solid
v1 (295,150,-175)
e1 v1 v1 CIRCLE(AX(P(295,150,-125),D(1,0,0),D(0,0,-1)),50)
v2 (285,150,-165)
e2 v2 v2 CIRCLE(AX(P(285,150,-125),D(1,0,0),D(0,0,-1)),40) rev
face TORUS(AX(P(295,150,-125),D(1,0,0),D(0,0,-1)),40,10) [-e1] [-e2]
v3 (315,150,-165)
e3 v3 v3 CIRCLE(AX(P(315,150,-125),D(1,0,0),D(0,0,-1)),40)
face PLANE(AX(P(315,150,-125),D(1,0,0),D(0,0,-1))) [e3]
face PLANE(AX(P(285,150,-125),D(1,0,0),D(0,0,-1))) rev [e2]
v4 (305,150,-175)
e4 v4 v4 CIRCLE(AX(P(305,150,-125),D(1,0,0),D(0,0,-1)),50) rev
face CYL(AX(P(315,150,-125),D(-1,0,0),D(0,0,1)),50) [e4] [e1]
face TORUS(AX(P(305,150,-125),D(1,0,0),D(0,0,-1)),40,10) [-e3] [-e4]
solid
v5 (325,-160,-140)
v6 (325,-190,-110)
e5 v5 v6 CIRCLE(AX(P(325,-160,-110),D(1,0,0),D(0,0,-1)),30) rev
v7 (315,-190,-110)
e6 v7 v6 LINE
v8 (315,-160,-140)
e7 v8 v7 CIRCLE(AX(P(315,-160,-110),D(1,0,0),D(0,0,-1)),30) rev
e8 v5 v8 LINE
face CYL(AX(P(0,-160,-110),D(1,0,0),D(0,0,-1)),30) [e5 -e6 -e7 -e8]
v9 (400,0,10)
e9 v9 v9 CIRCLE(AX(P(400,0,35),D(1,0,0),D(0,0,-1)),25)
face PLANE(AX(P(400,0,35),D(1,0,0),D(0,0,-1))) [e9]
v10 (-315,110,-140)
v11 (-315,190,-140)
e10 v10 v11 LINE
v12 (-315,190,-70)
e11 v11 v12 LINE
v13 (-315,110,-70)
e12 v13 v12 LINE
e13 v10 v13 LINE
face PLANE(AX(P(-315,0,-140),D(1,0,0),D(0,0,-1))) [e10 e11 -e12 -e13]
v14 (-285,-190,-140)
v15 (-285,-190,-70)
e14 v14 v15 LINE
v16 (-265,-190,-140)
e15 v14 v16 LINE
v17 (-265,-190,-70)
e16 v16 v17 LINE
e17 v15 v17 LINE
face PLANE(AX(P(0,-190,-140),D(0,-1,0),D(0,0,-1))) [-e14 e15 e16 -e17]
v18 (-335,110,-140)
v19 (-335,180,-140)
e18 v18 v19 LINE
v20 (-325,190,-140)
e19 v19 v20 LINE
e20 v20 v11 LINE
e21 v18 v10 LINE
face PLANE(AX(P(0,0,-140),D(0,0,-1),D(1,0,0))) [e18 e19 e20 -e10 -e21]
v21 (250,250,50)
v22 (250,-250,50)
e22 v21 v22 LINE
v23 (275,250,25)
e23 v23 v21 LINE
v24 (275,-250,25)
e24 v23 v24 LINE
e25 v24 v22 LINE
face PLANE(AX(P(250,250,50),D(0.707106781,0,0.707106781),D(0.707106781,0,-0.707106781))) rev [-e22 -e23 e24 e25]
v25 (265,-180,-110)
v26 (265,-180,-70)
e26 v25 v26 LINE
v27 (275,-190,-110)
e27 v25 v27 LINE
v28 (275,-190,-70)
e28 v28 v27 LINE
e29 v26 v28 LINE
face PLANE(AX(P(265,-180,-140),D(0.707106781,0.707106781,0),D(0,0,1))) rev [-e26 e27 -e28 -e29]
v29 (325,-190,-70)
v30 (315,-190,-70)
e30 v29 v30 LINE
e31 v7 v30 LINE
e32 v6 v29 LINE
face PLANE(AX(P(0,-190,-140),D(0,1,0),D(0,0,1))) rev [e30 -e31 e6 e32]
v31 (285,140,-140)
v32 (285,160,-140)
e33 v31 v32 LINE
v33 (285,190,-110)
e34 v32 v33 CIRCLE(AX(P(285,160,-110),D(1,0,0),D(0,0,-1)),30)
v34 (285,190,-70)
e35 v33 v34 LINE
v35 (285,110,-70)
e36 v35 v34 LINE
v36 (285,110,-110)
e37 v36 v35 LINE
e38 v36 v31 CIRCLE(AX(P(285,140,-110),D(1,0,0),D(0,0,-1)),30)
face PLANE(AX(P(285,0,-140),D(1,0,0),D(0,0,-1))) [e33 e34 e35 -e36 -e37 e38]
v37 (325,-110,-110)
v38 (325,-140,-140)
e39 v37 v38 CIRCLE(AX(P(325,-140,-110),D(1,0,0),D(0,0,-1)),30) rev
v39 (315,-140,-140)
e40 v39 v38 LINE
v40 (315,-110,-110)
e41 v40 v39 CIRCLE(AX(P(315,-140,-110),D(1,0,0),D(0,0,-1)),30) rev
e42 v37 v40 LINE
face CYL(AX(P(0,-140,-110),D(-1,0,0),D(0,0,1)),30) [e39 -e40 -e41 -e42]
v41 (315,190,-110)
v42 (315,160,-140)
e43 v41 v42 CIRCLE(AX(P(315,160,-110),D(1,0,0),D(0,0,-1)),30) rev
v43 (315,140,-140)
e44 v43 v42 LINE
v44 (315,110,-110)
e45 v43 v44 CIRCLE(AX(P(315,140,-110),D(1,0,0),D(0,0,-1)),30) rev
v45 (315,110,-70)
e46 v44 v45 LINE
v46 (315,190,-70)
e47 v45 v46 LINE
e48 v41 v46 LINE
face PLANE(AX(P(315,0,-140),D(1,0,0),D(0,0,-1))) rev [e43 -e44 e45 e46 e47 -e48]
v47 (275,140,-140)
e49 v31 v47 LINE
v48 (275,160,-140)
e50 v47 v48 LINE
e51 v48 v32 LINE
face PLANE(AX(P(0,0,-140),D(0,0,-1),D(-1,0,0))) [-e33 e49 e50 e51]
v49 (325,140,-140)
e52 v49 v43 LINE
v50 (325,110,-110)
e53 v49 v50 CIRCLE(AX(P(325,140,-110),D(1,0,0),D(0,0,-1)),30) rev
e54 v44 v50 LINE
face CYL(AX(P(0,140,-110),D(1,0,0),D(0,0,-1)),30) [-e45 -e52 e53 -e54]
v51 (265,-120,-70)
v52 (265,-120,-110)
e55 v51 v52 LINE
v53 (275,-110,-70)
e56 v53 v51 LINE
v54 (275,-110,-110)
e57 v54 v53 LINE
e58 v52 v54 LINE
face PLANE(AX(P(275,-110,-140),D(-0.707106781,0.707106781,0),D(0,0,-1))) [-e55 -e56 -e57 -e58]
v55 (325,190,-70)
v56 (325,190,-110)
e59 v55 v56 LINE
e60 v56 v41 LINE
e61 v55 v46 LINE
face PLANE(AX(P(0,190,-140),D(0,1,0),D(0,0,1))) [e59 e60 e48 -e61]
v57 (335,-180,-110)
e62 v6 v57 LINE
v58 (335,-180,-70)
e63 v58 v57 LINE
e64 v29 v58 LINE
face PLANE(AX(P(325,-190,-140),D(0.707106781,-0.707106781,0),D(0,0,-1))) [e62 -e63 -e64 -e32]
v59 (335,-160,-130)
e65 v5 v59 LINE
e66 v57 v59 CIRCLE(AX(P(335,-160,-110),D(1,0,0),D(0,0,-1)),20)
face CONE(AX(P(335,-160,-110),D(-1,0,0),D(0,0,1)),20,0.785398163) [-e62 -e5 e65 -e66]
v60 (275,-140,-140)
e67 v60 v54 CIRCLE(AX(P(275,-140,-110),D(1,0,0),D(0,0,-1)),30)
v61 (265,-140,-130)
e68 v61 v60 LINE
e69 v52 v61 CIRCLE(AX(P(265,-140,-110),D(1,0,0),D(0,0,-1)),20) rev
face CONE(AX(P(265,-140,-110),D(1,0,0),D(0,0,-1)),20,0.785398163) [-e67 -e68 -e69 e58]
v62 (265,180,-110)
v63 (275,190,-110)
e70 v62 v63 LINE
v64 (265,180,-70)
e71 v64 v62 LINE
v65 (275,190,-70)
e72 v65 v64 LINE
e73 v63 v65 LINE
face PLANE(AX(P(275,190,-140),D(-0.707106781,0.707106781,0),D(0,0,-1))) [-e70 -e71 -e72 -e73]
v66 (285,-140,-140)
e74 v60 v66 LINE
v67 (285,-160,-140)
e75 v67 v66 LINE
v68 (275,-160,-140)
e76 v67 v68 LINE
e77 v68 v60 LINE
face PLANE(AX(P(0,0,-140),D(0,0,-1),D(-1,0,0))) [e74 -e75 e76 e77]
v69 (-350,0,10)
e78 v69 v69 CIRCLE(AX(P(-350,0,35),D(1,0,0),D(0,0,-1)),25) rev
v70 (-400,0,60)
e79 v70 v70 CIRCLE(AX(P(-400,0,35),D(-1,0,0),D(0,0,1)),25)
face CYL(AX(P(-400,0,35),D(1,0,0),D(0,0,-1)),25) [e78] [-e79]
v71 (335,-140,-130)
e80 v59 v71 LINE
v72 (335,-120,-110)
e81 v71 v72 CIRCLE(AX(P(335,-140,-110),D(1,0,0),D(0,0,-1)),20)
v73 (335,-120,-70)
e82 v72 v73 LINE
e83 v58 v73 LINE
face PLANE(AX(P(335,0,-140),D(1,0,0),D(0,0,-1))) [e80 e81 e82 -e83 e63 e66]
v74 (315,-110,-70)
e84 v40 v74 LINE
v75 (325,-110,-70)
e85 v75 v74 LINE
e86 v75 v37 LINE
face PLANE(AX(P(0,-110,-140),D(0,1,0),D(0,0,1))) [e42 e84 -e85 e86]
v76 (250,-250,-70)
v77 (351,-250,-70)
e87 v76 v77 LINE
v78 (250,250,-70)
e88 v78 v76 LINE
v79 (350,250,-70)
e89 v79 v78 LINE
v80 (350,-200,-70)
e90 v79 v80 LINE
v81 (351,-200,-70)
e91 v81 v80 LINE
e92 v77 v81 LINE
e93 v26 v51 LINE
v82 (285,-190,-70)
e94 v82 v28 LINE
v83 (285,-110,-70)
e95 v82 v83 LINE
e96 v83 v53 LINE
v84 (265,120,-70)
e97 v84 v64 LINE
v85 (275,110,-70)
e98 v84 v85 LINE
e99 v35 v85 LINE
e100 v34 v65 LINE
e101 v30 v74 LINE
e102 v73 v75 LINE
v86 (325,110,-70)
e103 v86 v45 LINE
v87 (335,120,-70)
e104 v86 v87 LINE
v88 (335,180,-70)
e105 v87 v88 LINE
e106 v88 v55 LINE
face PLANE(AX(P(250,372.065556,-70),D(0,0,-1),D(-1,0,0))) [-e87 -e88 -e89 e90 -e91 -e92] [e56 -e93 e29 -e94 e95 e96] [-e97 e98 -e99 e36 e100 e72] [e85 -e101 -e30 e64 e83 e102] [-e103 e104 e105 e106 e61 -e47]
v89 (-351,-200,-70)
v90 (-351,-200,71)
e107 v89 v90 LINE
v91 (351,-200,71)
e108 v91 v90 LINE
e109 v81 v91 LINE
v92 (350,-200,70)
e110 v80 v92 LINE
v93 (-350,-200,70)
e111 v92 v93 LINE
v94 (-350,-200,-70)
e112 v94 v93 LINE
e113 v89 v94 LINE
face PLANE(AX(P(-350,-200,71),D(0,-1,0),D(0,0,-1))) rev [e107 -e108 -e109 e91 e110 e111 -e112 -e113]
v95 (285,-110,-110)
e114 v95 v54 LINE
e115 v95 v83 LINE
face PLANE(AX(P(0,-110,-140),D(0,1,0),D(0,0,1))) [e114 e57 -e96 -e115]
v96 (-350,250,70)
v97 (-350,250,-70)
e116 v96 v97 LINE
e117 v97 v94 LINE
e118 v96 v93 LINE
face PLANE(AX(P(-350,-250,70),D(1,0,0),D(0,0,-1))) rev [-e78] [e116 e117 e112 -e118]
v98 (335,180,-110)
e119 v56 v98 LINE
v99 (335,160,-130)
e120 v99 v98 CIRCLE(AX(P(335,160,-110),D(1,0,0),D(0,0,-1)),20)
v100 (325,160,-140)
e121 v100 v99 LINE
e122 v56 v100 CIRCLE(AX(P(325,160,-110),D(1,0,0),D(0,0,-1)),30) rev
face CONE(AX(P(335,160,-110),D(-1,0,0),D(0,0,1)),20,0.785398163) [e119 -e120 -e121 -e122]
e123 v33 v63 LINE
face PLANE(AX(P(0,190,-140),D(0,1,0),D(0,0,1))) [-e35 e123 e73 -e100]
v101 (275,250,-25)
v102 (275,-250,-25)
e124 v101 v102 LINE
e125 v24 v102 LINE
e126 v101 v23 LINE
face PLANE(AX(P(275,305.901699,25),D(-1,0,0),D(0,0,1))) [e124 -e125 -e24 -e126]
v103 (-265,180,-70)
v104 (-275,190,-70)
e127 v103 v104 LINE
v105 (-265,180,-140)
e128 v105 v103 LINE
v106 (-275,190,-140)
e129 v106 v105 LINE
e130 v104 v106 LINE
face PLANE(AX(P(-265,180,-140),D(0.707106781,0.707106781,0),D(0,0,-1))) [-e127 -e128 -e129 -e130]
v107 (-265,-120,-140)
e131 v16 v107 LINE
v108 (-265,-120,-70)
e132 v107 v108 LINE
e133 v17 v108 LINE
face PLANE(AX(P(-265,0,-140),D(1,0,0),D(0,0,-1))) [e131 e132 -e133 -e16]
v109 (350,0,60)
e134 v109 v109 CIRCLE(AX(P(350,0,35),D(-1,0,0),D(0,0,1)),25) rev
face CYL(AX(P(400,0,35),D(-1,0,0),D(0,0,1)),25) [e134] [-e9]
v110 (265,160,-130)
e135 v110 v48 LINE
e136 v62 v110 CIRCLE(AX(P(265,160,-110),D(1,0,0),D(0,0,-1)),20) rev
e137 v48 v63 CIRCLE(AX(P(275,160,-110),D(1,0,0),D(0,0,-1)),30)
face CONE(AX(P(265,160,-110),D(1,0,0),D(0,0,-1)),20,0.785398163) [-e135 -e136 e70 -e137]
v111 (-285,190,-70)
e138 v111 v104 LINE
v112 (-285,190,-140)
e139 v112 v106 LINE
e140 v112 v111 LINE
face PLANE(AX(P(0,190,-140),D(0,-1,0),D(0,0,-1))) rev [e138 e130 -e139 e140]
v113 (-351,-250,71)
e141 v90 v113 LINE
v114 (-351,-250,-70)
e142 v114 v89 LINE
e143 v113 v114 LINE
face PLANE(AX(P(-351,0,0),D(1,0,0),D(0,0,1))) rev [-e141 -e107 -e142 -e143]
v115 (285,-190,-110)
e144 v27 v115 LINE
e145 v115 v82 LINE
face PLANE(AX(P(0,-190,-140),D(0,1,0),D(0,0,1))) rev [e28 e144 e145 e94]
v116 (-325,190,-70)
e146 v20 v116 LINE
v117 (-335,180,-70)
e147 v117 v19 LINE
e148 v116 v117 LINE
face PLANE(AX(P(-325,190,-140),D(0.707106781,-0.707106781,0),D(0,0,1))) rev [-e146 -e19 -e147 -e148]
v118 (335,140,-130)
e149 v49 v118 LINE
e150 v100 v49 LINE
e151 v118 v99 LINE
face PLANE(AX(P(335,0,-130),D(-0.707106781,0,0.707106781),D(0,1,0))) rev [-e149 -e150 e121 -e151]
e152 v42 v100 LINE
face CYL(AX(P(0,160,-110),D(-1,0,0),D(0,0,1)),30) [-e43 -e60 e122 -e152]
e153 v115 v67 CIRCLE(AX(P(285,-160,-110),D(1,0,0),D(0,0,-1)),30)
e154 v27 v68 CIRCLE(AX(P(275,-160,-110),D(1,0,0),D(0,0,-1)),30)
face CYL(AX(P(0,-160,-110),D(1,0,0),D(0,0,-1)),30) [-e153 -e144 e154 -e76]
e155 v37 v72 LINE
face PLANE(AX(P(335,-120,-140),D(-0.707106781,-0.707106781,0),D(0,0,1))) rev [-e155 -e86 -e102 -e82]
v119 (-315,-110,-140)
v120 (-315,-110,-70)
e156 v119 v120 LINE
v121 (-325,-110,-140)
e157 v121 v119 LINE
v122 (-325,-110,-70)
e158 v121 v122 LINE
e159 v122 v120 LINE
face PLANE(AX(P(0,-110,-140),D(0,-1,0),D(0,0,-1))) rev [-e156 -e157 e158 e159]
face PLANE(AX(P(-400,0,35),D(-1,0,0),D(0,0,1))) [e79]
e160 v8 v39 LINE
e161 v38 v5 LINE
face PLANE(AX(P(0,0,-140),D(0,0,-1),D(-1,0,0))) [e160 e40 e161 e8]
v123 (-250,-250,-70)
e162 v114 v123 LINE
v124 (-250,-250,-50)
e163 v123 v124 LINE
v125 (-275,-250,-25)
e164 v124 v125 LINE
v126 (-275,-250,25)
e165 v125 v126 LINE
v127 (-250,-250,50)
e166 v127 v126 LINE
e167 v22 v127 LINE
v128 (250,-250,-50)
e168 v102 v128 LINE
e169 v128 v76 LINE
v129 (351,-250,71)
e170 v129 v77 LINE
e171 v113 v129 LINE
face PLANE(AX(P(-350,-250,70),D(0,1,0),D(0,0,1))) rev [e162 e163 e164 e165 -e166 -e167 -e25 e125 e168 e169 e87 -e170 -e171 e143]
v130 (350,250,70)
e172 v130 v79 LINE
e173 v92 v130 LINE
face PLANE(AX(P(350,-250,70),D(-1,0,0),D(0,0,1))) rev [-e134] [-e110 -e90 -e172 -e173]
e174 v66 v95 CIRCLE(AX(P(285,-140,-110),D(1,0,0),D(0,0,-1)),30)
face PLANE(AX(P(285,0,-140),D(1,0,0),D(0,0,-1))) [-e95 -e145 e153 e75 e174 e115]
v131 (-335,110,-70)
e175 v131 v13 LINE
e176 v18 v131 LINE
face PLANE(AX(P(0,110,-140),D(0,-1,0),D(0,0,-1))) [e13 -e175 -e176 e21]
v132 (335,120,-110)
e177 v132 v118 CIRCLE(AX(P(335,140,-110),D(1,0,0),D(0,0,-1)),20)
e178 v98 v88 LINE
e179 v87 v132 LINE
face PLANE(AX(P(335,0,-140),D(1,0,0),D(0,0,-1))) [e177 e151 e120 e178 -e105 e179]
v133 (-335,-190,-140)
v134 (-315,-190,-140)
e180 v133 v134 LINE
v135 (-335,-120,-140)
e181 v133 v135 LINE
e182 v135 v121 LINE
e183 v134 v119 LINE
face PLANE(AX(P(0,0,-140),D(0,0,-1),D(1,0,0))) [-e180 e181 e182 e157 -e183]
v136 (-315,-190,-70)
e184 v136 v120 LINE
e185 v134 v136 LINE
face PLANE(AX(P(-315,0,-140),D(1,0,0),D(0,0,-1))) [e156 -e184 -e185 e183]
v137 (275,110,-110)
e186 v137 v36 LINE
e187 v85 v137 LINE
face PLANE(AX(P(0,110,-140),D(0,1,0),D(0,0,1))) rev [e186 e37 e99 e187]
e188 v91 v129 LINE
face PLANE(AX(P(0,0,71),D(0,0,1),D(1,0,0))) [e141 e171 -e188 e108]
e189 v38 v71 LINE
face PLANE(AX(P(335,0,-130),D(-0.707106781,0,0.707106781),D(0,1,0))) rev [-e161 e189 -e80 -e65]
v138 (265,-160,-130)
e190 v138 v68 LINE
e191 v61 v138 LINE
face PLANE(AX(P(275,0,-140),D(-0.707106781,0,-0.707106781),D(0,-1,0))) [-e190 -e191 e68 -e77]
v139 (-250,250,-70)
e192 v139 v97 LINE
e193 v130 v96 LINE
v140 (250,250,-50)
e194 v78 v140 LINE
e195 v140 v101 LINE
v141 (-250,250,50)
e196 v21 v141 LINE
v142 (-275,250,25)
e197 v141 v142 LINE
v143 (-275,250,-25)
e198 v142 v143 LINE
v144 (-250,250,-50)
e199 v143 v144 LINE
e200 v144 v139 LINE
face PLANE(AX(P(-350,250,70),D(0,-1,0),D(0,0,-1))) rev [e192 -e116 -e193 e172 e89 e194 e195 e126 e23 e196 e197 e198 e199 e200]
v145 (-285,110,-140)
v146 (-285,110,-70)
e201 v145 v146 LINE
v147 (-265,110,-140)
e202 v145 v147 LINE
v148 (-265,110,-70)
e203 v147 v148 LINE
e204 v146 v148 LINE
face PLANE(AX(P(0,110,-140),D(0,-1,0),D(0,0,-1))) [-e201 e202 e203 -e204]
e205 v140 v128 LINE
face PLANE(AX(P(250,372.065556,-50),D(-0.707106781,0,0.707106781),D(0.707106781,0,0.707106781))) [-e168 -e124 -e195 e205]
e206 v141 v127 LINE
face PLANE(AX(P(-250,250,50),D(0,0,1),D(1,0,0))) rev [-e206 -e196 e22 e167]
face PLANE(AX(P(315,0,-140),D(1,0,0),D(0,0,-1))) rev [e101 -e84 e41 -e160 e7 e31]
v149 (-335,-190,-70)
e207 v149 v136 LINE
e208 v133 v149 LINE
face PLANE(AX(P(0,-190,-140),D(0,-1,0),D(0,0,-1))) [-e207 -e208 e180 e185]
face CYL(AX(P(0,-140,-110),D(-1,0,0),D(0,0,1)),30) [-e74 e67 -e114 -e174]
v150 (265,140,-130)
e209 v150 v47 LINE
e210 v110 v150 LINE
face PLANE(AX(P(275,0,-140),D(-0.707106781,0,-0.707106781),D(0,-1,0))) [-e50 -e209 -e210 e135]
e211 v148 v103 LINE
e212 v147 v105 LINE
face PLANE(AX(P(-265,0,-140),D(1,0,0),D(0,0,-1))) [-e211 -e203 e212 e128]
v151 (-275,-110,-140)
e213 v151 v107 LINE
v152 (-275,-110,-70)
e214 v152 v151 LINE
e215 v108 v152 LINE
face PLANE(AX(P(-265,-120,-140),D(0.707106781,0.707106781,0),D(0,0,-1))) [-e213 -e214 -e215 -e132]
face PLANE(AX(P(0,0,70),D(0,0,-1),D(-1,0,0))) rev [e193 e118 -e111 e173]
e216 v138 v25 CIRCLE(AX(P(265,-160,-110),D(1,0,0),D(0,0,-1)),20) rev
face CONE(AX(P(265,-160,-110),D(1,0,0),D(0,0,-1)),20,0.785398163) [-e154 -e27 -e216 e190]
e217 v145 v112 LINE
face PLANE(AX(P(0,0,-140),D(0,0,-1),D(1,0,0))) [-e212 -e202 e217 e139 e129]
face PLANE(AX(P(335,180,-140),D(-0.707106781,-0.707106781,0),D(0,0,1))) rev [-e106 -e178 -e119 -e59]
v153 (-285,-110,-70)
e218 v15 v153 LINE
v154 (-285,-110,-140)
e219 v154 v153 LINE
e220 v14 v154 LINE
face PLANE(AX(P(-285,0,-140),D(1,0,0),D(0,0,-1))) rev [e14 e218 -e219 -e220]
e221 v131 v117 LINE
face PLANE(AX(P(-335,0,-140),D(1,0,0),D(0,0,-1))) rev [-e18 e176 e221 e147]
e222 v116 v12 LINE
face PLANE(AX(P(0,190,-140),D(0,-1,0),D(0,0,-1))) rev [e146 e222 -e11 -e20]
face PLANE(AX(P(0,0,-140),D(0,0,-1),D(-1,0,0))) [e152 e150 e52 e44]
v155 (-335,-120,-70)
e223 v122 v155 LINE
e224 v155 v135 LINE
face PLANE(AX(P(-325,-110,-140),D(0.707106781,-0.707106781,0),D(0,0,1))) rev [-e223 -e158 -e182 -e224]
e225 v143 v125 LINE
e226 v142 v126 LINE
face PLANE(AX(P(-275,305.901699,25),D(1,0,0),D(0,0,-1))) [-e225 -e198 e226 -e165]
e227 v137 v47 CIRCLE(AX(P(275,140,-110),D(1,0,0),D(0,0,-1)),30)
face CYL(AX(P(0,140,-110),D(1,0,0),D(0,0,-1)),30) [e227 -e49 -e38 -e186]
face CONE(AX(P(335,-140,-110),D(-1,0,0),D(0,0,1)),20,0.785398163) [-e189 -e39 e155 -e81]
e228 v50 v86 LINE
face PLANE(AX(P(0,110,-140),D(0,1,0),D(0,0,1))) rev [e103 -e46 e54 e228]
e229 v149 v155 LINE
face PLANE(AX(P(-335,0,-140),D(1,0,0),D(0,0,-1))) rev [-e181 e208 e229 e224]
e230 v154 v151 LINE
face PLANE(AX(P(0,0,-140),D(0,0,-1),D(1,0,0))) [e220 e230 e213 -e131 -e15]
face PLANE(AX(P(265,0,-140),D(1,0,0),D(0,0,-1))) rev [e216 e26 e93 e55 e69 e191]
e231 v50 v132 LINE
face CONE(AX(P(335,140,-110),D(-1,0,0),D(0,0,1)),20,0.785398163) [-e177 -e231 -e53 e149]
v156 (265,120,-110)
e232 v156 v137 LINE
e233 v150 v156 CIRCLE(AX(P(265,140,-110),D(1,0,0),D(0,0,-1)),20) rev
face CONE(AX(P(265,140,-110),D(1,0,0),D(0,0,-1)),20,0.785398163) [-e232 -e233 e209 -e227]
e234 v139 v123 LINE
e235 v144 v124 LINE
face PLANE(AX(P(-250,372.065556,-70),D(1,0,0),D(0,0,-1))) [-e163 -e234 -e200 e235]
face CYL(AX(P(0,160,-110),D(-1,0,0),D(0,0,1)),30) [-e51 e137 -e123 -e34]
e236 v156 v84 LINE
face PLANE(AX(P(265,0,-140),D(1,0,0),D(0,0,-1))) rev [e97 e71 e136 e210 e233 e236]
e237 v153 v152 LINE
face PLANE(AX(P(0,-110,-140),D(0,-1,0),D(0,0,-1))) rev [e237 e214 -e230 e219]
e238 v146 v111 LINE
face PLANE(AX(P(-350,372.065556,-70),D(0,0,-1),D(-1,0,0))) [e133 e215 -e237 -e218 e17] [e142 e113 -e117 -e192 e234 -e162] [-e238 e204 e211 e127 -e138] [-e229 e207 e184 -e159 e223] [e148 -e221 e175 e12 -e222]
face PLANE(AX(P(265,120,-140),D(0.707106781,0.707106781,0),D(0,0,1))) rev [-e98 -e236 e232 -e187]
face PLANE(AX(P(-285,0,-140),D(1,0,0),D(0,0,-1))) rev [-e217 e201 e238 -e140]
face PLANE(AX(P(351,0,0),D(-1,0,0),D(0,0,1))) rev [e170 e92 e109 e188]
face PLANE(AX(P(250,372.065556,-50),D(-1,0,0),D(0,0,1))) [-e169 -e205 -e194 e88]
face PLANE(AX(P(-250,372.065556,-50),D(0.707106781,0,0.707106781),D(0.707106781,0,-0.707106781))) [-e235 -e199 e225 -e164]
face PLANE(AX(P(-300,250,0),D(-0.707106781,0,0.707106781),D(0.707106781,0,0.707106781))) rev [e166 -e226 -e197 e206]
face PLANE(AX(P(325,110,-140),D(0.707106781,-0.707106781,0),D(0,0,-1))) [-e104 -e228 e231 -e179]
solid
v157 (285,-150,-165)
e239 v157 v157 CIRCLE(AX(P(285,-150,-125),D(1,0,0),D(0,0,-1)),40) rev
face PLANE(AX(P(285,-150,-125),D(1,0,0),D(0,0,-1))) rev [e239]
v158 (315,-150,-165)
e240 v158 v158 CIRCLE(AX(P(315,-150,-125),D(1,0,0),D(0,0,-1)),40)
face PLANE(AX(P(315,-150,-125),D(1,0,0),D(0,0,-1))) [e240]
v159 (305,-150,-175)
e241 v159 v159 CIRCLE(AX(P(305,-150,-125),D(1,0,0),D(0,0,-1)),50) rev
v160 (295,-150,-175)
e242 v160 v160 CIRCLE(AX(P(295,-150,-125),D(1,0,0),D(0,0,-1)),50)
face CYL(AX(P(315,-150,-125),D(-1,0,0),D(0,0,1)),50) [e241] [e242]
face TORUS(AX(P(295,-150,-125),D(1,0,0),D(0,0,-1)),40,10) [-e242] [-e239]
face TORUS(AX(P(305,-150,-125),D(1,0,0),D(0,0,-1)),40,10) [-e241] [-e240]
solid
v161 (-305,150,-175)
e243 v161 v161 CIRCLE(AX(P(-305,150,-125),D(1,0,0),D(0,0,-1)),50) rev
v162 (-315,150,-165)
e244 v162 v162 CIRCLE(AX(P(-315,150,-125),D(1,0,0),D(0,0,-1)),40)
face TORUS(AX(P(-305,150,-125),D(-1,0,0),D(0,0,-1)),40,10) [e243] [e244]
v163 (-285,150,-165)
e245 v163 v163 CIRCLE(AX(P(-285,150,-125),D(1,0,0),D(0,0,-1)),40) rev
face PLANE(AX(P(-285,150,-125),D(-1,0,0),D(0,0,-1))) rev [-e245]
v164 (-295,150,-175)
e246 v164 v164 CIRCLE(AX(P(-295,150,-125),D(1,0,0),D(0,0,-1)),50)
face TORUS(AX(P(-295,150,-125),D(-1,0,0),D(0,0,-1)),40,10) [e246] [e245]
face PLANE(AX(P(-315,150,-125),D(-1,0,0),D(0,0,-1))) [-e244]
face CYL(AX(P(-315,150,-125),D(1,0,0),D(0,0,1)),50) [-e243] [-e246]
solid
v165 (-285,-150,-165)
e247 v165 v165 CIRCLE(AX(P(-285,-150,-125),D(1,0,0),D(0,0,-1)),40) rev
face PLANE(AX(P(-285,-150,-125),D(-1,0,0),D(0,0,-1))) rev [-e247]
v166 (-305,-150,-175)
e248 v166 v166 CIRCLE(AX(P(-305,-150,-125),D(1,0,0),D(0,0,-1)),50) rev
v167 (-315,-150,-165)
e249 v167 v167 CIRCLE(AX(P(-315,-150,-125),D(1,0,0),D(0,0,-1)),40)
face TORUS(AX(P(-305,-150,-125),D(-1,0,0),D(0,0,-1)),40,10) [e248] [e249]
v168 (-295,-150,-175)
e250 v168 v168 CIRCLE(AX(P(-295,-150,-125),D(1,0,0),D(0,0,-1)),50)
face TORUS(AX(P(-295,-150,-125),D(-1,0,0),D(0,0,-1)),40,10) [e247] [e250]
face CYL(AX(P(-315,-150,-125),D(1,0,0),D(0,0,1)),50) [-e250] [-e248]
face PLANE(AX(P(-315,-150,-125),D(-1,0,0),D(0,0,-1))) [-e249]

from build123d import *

# Parameters (mm, degrees)
SKETCH1_W             = 700
SKETCH1_H             = 500
BOSS_EXTRUDE1_DEPTH   = 70
CUT_EXTRUDE1_DEPTH    = 615.328902136
SKETCH3_R             = 25
BOSS_EXTRUDE2_DEPTH   = 50
BOSS_EXTRUDE3_START   = 50
SKETCH4_R             = 25
BOSS_EXTRUDE3_DEPTH   = 50
BOSS_EXTRUDE4_DEPTH   = 500
BOSS_EXTRUDE5_DEPTH   = 500
SKETCH7_W             = 20
SKETCH7_H             = 80
BOSS_EXTRUDE6_DEPTH   = 70
FILLET1_R             = 30
SKETCH8_R             = 50
BOSS_EXTRUDE8_DEPTH   = 30
BOSS_EXTRUDE8_2_DEPTH = 30
FILLET2_R             = 10
FILLET3_R             = 10
CHAMFER1_SIZE         = 10
MIRROR1_START         = -140
MIRROR1_DEPTH         = 70
SKETCH9_W             = 700
SKETCH9_H             = 50
BOSS_EXTRUDE9_DEPTH   = 1
SKETCH10_W            = 141
SKETCH10_H            = 50
BOSS_EXTRUDE10_DEPTH  = 1


# Read off the part's stored shape, not the designer's step: Mirror1
with BuildPart() as part:
    # Sketch1 → Boss-Extrude1 (new body)
    with BuildSketch(Plane.XY):
        Rectangle(SKETCH1_W, SKETCH1_H)
    extrude(amount=BOSS_EXTRUDE1_DEPTH)

    # Sketch2 → Cut-Extrude1 (cut, through all)
    with BuildSketch(Plane.XZ.offset(250)):
        Polygon((-300, 0), (-250, 50), (250, 50), (300, 0), align=None)
    extrude(amount=-CUT_EXTRUDE1_DEPTH, mode=Mode.SUBTRACT)

    # Sketch3 → Boss-Extrude2 (add)
    with BuildSketch(Plane.ZY.offset(350)):
        with Locations(Location((35, 0, 0), (0, 0, 180))):
            Circle(SKETCH3_R)
    extrude(amount=BOSS_EXTRUDE2_DEPTH)

    # Sketch4 → Boss-Extrude3 (add)
    with BuildSketch(Plane(origin=(350, 0, 0), x_dir=(0, 0, -1), z_dir=(1, 0, 0)).offset(BOSS_EXTRUDE3_START)):
        with Locations((-35, 0)):
            Circle(SKETCH4_R)
    extrude(amount=-BOSS_EXTRUDE3_DEPTH)

    # Sketch5 → Boss-Extrude4 (add)
    with BuildSketch(Plane.XZ.offset(250)):
        Polygon((-350, 0), (-350, -50), (-350, -70), (-250, -70), (-250, -50), (-300, 0), align=None)
        Polygon((350, 0), (350, -50), (350, -70), (250, -70), (250, -50), (300, 0), align=None)
    extrude(amount=-BOSS_EXTRUDE4_DEPTH)

    # Sketch6 → Boss-Extrude5 (add)
    with BuildSketch(Plane.XZ.offset(250)):
        Polygon((-275, 25), (-275, -25), (-300, 0), align=None)
        Polygon((275, 25), (275, -25), (300, 0), align=None)
    extrude(amount=-BOSS_EXTRUDE5_DEPTH)

    # Sketch7 → Boss-Extrude6 (add)
    with BuildSketch(Plane(origin=(0, 0, -70), x_dir=(-1, 0, 0), z_dir=(0, 0, -1))):
        with Locations((-275, 150)):
            Rectangle(SKETCH7_W, SKETCH7_H)
        with Locations((-325, 150)):
            Rectangle(SKETCH7_W, SKETCH7_H)
        with Locations((-275, -150)):
            Rectangle(SKETCH7_W, SKETCH7_H)
        with Locations((-325, -150)):
            Rectangle(SKETCH7_W, SKETCH7_H)
    extrude(amount=BOSS_EXTRUDE6_DEPTH)

    # Fillet1
    fillet1_edges = [part.edges().sort_by_distance(p)[0] for p in [
        (325, 190, -140),
        (325, 110, -140),
        (275, -110, -140),
        (275, -190, -140),
        (325, -110, -140),
        (325, -190, -140),
        (275, 190, -140),
        (275, 110, -140),
    ]]
    fillet(fillet1_edges, radius=FILLET1_R)

    # Chamfer1
    chamfer1_edges = [part.edges().sort_by_distance(p)[0] for p in [
        (335, 190, -90),
        (335, 150, -140),
        (335, 110, -90),
        (335, 118.786796564, -131.213203436),
        (335, 181.213203436, -131.213203436),
        (265, 190, -90),
        (265, 150, -140),
        (265, 110, -90),
        (265, 118.786796564, -131.213203436),
        (265, 181.213203436, -131.213203436),
        (335, -110, -90),
        (335, -150, -140),
        (335, -190, -90),
        (335, -181.213203436, -131.213203436),
        (335, -118.786796564, -131.213203436),
        (265, -110, -90),
        (265, -150, -140),
        (265, -190, -90),
        (265, -181.213203436, -131.213203436),
        (265, -118.786796564, -131.213203436),
    ]]
    chamfer(chamfer1_edges, length=CHAMFER1_SIZE)

    # Mirror1 outline → Mirror1 (add)
    with BuildSketch(Plane.XY.offset(MIRROR1_START)):
        Polygon((-285, 190), (-285, 110), (-265, 110), (-265, 180), (-275, 190), align=None)
        Polygon((-335, 180), (-335, 110), (-315, 110), (-315, 190), (-325, 190), align=None)
        Polygon((-285, -110), (-285, -190), (-265, -190), (-265, -120), (-275, -110), align=None)
        Polygon((-335, -120), (-335, -190), (-315, -190), (-315, -110), (-325, -110), align=None)
    extrude(amount=MIRROR1_DEPTH)

    # Sketch9 → Boss-Extrude9 (add)
    with BuildSketch(Plane.XY.offset(70)):
        with Locations((0, -225)):
            Rectangle(SKETCH9_W, SKETCH9_H)
    extrude(amount=BOSS_EXTRUDE9_DEPTH)

    # Sketch10 → Boss-Extrude10 (add)
    with BuildSketch(Plane(origin=(350, 0, 0), x_dir=(0, 0, -1), z_dir=(1, 0, 0))):
        with Locations((-0.5, -225)):
            Rectangle(SKETCH10_W, SKETCH10_H)
    boss_extrude10 = extrude(amount=BOSS_EXTRUDE10_DEPTH)

    # Mirror3: Boss-Extrude10 across plane
    add(boss_extrude10.mirror(Plane(origin=(0, 0, 0), x_dir=(0, 0, 1), z_dir=(1, 0, 0))))


with BuildPart() as body_2:
    # Sketch8 → Boss-Extrude8 (new body)
    with BuildSketch(Plane(origin=(285, 0, 0), x_dir=(0, 0, -1), z_dir=(1, 0, 0))):
        with Locations((125, -150)):
            Circle(SKETCH8_R)
    extrude(amount=BOSS_EXTRUDE8_DEPTH)

    # Fillet2
    fillet2_edges = [body_2.edges().sort_by_distance(p)[0] for p in [
        (285, -150, -75),
        (315, -150, -75),
    ]]
    fillet(fillet2_edges, radius=FILLET2_R)


with BuildPart() as body_3:
    # Sketch8 → Boss-Extrude8 2 (new body)
    with BuildSketch(Plane(origin=(285, 0, 0), x_dir=(0, 0, -1), z_dir=(1, 0, 0))):
        with Locations((125, 150)):
            Circle(SKETCH8_R)
    extrude(amount=BOSS_EXTRUDE8_2_DEPTH)

    # Fillet3
    fillet3_edges = [body_3.edges().sort_by_distance(p)[0] for p in [
        (285, 150, -75),
        (315, 150, -75),
    ]]
    fillet(fillet3_edges, radius=FILLET3_R)


with BuildPart() as body_4:
    # Mirror2: mirrored copy
    add(body_3.part.mirror(Plane(origin=(0, 0, 0), x_dir=(0, 0, 1), z_dir=(1, 0, 0))))


with BuildPart() as body_5:
    # Mirror2 2: mirrored copy
    add(body_2.part.mirror(Plane(origin=(0, 0, 0), x_dir=(0, 0, 1), z_dir=(1, 0, 0))))


solid = Compound([part.part, body_2.part, body_3.part, body_4.part, body_5.part])
